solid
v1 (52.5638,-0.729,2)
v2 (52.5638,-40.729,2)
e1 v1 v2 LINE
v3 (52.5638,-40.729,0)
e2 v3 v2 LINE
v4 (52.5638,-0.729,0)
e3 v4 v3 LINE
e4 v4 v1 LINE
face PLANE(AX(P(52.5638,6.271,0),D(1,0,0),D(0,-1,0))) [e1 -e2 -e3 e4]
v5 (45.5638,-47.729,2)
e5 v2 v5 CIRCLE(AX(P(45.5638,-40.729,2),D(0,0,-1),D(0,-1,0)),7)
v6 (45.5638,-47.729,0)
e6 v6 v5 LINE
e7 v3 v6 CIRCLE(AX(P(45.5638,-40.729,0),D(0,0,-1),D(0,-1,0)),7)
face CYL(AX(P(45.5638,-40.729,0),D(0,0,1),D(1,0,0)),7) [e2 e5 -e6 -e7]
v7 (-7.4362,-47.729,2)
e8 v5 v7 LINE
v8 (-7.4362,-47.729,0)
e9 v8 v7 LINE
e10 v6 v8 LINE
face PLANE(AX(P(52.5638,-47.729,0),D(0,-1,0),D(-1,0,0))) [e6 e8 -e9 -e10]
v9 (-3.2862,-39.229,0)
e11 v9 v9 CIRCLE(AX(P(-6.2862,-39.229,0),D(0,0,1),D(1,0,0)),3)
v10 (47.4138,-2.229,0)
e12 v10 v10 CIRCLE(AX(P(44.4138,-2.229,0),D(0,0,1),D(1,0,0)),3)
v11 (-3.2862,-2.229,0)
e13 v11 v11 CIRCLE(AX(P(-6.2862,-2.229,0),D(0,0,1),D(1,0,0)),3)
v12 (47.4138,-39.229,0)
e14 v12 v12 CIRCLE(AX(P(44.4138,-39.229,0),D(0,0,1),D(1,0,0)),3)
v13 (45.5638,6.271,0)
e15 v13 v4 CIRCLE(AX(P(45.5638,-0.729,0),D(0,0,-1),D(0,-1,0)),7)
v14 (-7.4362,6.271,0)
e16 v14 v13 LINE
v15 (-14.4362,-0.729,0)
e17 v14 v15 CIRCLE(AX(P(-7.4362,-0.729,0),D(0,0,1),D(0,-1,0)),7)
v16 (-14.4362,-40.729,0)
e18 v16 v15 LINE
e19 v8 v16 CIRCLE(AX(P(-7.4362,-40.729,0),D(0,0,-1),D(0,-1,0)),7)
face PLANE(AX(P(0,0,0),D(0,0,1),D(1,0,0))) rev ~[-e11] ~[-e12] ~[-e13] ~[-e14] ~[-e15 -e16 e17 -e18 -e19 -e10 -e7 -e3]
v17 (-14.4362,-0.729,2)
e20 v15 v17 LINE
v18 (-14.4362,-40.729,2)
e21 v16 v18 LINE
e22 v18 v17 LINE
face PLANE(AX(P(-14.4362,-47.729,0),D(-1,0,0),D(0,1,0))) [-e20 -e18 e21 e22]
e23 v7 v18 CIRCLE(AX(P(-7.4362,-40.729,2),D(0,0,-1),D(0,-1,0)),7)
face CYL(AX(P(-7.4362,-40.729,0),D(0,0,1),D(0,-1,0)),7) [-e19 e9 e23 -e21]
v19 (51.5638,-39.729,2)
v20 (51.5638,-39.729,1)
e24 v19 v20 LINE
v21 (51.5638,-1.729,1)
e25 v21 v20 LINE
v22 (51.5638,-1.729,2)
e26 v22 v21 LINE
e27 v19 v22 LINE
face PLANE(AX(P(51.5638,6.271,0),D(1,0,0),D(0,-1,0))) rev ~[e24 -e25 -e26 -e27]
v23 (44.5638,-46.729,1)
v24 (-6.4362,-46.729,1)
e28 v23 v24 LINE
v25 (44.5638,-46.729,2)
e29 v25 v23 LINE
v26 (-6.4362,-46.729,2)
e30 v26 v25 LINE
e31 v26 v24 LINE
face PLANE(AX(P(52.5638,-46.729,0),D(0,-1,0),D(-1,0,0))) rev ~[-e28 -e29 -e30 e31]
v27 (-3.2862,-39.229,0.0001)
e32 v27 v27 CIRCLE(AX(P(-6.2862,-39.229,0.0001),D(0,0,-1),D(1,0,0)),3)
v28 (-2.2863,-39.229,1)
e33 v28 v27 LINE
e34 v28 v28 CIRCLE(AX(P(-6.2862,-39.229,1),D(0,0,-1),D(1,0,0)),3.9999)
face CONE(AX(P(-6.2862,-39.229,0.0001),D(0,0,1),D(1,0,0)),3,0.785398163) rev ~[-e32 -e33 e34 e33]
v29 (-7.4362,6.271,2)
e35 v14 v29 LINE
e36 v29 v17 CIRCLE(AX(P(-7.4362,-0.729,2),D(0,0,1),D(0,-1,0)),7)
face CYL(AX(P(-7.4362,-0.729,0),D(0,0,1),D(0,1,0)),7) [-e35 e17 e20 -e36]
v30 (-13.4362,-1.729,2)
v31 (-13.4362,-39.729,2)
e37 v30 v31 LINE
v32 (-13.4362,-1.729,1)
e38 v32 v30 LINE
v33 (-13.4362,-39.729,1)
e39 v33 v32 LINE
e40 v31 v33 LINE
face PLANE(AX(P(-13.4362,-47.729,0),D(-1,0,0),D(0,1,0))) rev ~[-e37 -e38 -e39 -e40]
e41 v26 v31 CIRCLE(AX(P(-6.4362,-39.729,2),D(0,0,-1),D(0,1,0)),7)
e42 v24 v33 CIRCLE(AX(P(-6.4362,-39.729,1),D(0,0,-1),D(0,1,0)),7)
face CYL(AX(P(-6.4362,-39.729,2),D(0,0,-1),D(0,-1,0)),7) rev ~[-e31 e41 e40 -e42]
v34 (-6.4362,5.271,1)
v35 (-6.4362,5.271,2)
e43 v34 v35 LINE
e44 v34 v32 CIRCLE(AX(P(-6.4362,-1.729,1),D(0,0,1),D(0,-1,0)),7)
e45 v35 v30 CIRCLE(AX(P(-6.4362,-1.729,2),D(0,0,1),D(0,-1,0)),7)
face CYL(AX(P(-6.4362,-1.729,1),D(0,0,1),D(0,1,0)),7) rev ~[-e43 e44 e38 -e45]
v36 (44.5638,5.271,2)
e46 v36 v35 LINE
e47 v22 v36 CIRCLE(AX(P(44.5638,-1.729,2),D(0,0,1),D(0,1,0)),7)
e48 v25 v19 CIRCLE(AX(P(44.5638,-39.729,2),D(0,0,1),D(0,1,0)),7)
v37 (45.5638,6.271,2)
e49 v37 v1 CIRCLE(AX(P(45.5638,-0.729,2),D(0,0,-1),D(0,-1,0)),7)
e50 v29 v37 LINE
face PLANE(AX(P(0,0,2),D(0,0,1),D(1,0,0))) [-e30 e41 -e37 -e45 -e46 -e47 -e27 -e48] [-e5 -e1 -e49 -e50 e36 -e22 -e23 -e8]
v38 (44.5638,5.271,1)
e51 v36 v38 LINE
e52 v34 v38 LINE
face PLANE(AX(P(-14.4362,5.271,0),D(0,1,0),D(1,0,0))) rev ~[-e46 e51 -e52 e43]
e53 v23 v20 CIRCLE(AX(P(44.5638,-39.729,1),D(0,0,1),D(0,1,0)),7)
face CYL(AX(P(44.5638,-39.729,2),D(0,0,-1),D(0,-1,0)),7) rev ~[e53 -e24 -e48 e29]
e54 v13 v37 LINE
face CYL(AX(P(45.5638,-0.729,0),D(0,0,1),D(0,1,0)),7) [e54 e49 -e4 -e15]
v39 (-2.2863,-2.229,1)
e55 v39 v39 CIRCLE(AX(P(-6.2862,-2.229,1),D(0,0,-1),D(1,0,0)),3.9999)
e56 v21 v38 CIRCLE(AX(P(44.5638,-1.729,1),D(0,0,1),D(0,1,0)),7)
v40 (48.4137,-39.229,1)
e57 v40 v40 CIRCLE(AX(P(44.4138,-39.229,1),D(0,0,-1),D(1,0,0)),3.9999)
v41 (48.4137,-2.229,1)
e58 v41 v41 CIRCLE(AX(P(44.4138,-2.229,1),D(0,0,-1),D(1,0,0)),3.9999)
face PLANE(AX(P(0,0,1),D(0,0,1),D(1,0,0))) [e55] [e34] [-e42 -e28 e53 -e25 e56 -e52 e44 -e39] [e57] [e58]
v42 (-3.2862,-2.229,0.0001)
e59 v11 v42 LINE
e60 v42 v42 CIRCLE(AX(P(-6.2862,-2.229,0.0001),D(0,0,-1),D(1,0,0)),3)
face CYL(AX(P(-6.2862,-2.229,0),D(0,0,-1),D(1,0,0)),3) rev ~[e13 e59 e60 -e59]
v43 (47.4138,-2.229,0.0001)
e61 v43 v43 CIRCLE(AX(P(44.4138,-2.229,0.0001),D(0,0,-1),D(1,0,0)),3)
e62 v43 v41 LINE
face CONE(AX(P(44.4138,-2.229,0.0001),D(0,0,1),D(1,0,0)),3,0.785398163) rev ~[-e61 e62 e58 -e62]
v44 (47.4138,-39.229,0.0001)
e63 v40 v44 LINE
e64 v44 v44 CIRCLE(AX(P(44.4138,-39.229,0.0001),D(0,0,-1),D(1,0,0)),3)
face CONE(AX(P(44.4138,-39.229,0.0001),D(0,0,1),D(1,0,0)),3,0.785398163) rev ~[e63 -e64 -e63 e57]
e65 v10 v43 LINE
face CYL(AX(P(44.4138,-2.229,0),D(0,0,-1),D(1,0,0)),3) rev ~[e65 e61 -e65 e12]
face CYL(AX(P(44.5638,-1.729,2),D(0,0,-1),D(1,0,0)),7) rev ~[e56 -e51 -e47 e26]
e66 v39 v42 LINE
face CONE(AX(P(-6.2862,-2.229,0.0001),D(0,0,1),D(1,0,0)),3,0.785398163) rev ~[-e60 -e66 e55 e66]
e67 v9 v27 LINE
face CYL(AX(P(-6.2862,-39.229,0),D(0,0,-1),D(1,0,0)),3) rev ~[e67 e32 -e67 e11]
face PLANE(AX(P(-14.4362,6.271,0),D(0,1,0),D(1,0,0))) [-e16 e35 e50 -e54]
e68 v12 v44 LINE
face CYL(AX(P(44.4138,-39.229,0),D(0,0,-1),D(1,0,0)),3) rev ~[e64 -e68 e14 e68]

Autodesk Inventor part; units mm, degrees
ref_plane "YZ Plane" through (0, 0, 0) normal (1, 0, 0) x (0, 1, 0)
ref_plane "XZ Plane" through (0, 0, 0) normal (0, 1, 0) x (-1, 0, 0)
ref_plane "XY Plane" through (0, 0, 0) normal (0, 0, 1) x (1, 0, 0)
sketch "Esboço1" plane through (0, 0, 0) normal (0, 0, 1) x (1, 0, 0)
  line L0 (-14.4362, 6.271) -> (52.5638, 6.271)
  line L1 (52.5638, 6.271) -> (52.5638, -47.729)
  line L2 (52.5638, -47.729) -> (-14.4362, -47.729)
  line L3 (-14.4362, -47.729) -> (-14.4362, 6.271)
  circle A0 centre (-6.2862, -2.229) radius 3
  circle A1 centre (-6.2862, -39.229) radius 3
  circle A2 centre (44.4138, -39.229) radius 3
  circle A3 centre (44.4138, -2.229) radius 3
  point P0 (0, 0)
  dimension "d0" = 67
  dimension "d1" = 54
  dimension "d6" = 6
  dimension "d7" = 6
  dimension "d8" = 6
  dimension "d9" = 6
  dimension "d17" = 50.7
  dimension "d18" = 50.7
  dimension "d19" = 37
  dimension "d20" = 37
  dimension "d21" = 8.15
  dimension "d22" = 8.5
  dimension "d24" = 8.15
  dimension "d26" = 8.5
  dimension "d27" = 8.15
  dimension "d28" = 8.15
  dimension "d29" = 8.5
  dimension "d30" = 8.5
extrude "Extrusão1" add sketch "Esboço1" along normal blind 2
shell "Casca1" thickness 1 removed faces 5 at (11.3623, -15.2254, 2) at (-3.2959, -39.4704, 1.3333) at (-3.2959, -2.4704, 1.3333) at (47.4041, -2.4704, 1.3333) at (47.4041, -39.4704, 1.3333)
chamfer "Chanfro1" distance 1 angle 45 4 edges at (-9.2862, -39.229, 1) (-9.2862, -2.229, 1) (41.4138, -2.229, 1) (41.4138, -39.229, 1)
fillet "Arredondamento1" radius 7 8 edges at (-13.4362, 5.271, 1.5) (-14.4362, 6.271, 1) (52.5638, 6.271, 1) (51.5638, 5.271, 1.5) (51.5638, -46.729, 1.5) (52.5638, -47.729, 1) (-13.4362, -46.729, 1.5) (-14.4362, -47.729, 1)
properties part number "capa de alguma parte da guitarra 2"
